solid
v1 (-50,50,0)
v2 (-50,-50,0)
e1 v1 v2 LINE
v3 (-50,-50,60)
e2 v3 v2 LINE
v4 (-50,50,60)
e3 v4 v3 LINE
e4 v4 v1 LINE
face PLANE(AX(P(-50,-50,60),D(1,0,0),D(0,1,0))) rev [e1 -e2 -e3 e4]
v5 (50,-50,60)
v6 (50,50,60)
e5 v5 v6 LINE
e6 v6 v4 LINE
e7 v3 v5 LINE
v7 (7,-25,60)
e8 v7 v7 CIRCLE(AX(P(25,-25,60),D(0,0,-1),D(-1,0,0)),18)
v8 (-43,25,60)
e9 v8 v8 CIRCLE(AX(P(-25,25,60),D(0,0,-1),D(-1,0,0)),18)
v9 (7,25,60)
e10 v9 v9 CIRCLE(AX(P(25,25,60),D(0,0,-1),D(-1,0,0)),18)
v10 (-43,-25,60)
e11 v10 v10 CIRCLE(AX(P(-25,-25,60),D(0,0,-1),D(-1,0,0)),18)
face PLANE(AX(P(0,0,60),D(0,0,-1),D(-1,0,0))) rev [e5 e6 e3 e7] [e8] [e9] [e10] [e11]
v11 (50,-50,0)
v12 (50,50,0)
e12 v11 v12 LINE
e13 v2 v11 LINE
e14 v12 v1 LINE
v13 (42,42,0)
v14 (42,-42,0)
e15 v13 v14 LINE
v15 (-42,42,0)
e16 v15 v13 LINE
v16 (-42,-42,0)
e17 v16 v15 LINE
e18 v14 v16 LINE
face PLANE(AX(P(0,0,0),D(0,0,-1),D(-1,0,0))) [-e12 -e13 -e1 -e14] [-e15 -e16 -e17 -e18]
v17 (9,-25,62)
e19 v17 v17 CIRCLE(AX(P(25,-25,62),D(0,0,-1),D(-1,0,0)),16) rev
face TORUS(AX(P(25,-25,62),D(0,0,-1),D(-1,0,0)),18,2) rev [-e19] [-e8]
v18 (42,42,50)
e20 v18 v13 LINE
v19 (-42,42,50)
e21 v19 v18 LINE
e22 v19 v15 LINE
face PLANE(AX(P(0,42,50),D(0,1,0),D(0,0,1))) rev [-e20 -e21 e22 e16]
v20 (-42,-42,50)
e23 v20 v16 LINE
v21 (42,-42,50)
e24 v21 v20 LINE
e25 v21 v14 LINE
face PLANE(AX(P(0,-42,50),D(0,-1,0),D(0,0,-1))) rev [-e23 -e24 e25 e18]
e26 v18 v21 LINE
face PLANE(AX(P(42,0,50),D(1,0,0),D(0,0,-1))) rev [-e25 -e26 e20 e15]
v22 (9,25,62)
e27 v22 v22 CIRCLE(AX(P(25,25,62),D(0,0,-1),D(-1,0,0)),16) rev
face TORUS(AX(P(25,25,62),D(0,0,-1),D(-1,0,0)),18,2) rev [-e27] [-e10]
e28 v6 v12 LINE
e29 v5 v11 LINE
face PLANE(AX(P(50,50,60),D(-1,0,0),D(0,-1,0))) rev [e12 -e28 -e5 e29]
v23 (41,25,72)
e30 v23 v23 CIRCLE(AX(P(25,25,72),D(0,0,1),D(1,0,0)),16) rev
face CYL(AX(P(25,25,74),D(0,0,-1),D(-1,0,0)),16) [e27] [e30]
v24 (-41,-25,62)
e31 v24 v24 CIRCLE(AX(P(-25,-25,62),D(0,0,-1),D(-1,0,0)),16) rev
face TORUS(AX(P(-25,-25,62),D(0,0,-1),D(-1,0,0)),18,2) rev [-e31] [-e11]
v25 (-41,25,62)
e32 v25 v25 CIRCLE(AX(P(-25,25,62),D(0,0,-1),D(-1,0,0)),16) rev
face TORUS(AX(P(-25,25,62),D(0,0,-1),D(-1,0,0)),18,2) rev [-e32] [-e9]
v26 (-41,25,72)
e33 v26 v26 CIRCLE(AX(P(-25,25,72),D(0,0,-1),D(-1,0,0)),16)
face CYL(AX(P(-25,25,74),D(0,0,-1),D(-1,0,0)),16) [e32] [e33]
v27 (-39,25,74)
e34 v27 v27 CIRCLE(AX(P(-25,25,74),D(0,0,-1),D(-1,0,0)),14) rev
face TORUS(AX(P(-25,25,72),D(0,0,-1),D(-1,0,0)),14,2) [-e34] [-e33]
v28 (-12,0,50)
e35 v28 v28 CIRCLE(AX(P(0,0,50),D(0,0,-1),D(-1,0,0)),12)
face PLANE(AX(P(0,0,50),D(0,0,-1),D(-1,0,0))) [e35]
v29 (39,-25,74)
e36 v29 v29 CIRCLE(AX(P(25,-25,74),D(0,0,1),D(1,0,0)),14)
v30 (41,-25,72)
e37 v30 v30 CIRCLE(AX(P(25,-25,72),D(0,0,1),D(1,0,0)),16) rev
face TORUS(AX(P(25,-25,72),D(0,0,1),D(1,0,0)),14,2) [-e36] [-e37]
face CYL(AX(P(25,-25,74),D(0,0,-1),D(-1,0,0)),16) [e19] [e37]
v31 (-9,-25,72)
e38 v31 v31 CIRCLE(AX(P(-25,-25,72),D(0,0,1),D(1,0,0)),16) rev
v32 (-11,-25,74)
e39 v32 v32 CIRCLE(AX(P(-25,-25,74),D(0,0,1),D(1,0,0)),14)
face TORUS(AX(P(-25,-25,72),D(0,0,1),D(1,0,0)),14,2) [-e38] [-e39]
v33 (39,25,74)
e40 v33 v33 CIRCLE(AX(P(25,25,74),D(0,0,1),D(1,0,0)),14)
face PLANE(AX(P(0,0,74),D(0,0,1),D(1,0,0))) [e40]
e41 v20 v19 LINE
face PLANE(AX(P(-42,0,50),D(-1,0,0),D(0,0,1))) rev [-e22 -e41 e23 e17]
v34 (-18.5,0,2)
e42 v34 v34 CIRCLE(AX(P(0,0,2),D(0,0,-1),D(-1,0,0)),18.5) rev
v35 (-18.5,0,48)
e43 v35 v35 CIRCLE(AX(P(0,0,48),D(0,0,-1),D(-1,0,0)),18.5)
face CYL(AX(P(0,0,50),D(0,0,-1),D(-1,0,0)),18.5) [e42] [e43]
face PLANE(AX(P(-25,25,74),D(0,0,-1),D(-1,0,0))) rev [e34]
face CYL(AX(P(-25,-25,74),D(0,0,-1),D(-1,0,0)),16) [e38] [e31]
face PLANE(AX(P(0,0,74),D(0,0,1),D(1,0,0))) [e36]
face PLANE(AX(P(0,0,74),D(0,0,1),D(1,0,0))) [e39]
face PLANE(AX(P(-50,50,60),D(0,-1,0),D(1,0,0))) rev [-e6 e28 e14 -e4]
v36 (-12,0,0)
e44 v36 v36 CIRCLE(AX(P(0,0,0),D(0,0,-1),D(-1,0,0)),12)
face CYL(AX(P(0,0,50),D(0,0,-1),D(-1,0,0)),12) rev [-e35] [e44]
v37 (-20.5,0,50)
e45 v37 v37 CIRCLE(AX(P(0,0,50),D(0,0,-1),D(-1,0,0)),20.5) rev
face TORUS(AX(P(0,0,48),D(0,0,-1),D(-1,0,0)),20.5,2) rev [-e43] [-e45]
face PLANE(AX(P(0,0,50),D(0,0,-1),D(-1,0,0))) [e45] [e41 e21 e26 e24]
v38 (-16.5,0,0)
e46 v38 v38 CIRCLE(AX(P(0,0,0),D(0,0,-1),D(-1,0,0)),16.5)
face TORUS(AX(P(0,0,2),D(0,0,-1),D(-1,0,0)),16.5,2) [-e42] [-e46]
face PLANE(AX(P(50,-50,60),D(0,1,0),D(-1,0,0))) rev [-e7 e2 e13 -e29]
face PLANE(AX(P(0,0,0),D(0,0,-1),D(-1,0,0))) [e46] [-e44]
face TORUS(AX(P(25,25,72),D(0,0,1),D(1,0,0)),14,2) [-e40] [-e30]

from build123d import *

# Parameters (mm, degrees)
ESQUISSE2_W             = 100
ESQUISSE2_H             = 100
BOSS_EXTRU_1_DEPTH      = 60
ESQUISSE3_R             = 16
BOSS_EXTRU_2_DEPTH      = 14
ESQUISSE4_W             = 84
ESQUISSE4_H             = 84
ESQUISSE4_R             = 18.5
ESQUISSE4_R_2           = 12
ENL_V_MAT_EXTRU_1_DEPTH = 50
CONG_9_R                = 2


with BuildPart() as part:
    # Esquisse2 → Boss.-Extru.1 (new body)
    with BuildSketch(Plane.XY):
        Rectangle(ESQUISSE2_W, ESQUISSE2_H)
    extrude(amount=BOSS_EXTRU_1_DEPTH)

    # Esquisse3 → Boss.-Extru.2 (add)
    with BuildSketch(Plane.XY.offset(60)):
        with Locations((25, 25)):
            Circle(ESQUISSE3_R)
        with Locations((25, -25)):
            Circle(ESQUISSE3_R)
        with Locations((-25, -25)):
            Circle(ESQUISSE3_R)
        with Locations((-25, 25)):
            Circle(ESQUISSE3_R)
    extrude(amount=BOSS_EXTRU_2_DEPTH)

    # Esquisse4 → Enlèv. mat.-Extru.1 (cut)
    # profile 1 of 2: a face of its own
    with BuildSketch(Plane(origin=(0, 0, 0), x_dir=(-1, 0, 0), z_dir=(0, 0, -1))):
        Rectangle(ESQUISSE4_W, ESQUISSE4_H)
        Circle(ESQUISSE4_R, mode=Mode.SUBTRACT)
    # profile 2 of 2: a face of its own
    with BuildSketch(Plane(origin=(0, 0, 0), x_dir=(-1, 0, 0), z_dir=(0, 0, -1))):
        Circle(ESQUISSE4_R_2)
    extrude(amount=-ENL_V_MAT_EXTRU_1_DEPTH, mode=Mode.SUBTRACT)

    # Congé9
    cong_9_edges = [part.edges().sort_by_distance(p)[0] for p in [
        (18.5, 0, 50),
        (18.5, 0, 0),
        (9, -25, 60),
        (9, -25, 74),
        (-41, -25, 60),
        (-41, -25, 74),
        (9, 25, 60),
        (9, 25, 74),
        (-41, 25, 60),
        (-41, 25, 74),
    ]]
    fillet(cong_9_edges, radius=CONG_9_R)


solid = part.part
